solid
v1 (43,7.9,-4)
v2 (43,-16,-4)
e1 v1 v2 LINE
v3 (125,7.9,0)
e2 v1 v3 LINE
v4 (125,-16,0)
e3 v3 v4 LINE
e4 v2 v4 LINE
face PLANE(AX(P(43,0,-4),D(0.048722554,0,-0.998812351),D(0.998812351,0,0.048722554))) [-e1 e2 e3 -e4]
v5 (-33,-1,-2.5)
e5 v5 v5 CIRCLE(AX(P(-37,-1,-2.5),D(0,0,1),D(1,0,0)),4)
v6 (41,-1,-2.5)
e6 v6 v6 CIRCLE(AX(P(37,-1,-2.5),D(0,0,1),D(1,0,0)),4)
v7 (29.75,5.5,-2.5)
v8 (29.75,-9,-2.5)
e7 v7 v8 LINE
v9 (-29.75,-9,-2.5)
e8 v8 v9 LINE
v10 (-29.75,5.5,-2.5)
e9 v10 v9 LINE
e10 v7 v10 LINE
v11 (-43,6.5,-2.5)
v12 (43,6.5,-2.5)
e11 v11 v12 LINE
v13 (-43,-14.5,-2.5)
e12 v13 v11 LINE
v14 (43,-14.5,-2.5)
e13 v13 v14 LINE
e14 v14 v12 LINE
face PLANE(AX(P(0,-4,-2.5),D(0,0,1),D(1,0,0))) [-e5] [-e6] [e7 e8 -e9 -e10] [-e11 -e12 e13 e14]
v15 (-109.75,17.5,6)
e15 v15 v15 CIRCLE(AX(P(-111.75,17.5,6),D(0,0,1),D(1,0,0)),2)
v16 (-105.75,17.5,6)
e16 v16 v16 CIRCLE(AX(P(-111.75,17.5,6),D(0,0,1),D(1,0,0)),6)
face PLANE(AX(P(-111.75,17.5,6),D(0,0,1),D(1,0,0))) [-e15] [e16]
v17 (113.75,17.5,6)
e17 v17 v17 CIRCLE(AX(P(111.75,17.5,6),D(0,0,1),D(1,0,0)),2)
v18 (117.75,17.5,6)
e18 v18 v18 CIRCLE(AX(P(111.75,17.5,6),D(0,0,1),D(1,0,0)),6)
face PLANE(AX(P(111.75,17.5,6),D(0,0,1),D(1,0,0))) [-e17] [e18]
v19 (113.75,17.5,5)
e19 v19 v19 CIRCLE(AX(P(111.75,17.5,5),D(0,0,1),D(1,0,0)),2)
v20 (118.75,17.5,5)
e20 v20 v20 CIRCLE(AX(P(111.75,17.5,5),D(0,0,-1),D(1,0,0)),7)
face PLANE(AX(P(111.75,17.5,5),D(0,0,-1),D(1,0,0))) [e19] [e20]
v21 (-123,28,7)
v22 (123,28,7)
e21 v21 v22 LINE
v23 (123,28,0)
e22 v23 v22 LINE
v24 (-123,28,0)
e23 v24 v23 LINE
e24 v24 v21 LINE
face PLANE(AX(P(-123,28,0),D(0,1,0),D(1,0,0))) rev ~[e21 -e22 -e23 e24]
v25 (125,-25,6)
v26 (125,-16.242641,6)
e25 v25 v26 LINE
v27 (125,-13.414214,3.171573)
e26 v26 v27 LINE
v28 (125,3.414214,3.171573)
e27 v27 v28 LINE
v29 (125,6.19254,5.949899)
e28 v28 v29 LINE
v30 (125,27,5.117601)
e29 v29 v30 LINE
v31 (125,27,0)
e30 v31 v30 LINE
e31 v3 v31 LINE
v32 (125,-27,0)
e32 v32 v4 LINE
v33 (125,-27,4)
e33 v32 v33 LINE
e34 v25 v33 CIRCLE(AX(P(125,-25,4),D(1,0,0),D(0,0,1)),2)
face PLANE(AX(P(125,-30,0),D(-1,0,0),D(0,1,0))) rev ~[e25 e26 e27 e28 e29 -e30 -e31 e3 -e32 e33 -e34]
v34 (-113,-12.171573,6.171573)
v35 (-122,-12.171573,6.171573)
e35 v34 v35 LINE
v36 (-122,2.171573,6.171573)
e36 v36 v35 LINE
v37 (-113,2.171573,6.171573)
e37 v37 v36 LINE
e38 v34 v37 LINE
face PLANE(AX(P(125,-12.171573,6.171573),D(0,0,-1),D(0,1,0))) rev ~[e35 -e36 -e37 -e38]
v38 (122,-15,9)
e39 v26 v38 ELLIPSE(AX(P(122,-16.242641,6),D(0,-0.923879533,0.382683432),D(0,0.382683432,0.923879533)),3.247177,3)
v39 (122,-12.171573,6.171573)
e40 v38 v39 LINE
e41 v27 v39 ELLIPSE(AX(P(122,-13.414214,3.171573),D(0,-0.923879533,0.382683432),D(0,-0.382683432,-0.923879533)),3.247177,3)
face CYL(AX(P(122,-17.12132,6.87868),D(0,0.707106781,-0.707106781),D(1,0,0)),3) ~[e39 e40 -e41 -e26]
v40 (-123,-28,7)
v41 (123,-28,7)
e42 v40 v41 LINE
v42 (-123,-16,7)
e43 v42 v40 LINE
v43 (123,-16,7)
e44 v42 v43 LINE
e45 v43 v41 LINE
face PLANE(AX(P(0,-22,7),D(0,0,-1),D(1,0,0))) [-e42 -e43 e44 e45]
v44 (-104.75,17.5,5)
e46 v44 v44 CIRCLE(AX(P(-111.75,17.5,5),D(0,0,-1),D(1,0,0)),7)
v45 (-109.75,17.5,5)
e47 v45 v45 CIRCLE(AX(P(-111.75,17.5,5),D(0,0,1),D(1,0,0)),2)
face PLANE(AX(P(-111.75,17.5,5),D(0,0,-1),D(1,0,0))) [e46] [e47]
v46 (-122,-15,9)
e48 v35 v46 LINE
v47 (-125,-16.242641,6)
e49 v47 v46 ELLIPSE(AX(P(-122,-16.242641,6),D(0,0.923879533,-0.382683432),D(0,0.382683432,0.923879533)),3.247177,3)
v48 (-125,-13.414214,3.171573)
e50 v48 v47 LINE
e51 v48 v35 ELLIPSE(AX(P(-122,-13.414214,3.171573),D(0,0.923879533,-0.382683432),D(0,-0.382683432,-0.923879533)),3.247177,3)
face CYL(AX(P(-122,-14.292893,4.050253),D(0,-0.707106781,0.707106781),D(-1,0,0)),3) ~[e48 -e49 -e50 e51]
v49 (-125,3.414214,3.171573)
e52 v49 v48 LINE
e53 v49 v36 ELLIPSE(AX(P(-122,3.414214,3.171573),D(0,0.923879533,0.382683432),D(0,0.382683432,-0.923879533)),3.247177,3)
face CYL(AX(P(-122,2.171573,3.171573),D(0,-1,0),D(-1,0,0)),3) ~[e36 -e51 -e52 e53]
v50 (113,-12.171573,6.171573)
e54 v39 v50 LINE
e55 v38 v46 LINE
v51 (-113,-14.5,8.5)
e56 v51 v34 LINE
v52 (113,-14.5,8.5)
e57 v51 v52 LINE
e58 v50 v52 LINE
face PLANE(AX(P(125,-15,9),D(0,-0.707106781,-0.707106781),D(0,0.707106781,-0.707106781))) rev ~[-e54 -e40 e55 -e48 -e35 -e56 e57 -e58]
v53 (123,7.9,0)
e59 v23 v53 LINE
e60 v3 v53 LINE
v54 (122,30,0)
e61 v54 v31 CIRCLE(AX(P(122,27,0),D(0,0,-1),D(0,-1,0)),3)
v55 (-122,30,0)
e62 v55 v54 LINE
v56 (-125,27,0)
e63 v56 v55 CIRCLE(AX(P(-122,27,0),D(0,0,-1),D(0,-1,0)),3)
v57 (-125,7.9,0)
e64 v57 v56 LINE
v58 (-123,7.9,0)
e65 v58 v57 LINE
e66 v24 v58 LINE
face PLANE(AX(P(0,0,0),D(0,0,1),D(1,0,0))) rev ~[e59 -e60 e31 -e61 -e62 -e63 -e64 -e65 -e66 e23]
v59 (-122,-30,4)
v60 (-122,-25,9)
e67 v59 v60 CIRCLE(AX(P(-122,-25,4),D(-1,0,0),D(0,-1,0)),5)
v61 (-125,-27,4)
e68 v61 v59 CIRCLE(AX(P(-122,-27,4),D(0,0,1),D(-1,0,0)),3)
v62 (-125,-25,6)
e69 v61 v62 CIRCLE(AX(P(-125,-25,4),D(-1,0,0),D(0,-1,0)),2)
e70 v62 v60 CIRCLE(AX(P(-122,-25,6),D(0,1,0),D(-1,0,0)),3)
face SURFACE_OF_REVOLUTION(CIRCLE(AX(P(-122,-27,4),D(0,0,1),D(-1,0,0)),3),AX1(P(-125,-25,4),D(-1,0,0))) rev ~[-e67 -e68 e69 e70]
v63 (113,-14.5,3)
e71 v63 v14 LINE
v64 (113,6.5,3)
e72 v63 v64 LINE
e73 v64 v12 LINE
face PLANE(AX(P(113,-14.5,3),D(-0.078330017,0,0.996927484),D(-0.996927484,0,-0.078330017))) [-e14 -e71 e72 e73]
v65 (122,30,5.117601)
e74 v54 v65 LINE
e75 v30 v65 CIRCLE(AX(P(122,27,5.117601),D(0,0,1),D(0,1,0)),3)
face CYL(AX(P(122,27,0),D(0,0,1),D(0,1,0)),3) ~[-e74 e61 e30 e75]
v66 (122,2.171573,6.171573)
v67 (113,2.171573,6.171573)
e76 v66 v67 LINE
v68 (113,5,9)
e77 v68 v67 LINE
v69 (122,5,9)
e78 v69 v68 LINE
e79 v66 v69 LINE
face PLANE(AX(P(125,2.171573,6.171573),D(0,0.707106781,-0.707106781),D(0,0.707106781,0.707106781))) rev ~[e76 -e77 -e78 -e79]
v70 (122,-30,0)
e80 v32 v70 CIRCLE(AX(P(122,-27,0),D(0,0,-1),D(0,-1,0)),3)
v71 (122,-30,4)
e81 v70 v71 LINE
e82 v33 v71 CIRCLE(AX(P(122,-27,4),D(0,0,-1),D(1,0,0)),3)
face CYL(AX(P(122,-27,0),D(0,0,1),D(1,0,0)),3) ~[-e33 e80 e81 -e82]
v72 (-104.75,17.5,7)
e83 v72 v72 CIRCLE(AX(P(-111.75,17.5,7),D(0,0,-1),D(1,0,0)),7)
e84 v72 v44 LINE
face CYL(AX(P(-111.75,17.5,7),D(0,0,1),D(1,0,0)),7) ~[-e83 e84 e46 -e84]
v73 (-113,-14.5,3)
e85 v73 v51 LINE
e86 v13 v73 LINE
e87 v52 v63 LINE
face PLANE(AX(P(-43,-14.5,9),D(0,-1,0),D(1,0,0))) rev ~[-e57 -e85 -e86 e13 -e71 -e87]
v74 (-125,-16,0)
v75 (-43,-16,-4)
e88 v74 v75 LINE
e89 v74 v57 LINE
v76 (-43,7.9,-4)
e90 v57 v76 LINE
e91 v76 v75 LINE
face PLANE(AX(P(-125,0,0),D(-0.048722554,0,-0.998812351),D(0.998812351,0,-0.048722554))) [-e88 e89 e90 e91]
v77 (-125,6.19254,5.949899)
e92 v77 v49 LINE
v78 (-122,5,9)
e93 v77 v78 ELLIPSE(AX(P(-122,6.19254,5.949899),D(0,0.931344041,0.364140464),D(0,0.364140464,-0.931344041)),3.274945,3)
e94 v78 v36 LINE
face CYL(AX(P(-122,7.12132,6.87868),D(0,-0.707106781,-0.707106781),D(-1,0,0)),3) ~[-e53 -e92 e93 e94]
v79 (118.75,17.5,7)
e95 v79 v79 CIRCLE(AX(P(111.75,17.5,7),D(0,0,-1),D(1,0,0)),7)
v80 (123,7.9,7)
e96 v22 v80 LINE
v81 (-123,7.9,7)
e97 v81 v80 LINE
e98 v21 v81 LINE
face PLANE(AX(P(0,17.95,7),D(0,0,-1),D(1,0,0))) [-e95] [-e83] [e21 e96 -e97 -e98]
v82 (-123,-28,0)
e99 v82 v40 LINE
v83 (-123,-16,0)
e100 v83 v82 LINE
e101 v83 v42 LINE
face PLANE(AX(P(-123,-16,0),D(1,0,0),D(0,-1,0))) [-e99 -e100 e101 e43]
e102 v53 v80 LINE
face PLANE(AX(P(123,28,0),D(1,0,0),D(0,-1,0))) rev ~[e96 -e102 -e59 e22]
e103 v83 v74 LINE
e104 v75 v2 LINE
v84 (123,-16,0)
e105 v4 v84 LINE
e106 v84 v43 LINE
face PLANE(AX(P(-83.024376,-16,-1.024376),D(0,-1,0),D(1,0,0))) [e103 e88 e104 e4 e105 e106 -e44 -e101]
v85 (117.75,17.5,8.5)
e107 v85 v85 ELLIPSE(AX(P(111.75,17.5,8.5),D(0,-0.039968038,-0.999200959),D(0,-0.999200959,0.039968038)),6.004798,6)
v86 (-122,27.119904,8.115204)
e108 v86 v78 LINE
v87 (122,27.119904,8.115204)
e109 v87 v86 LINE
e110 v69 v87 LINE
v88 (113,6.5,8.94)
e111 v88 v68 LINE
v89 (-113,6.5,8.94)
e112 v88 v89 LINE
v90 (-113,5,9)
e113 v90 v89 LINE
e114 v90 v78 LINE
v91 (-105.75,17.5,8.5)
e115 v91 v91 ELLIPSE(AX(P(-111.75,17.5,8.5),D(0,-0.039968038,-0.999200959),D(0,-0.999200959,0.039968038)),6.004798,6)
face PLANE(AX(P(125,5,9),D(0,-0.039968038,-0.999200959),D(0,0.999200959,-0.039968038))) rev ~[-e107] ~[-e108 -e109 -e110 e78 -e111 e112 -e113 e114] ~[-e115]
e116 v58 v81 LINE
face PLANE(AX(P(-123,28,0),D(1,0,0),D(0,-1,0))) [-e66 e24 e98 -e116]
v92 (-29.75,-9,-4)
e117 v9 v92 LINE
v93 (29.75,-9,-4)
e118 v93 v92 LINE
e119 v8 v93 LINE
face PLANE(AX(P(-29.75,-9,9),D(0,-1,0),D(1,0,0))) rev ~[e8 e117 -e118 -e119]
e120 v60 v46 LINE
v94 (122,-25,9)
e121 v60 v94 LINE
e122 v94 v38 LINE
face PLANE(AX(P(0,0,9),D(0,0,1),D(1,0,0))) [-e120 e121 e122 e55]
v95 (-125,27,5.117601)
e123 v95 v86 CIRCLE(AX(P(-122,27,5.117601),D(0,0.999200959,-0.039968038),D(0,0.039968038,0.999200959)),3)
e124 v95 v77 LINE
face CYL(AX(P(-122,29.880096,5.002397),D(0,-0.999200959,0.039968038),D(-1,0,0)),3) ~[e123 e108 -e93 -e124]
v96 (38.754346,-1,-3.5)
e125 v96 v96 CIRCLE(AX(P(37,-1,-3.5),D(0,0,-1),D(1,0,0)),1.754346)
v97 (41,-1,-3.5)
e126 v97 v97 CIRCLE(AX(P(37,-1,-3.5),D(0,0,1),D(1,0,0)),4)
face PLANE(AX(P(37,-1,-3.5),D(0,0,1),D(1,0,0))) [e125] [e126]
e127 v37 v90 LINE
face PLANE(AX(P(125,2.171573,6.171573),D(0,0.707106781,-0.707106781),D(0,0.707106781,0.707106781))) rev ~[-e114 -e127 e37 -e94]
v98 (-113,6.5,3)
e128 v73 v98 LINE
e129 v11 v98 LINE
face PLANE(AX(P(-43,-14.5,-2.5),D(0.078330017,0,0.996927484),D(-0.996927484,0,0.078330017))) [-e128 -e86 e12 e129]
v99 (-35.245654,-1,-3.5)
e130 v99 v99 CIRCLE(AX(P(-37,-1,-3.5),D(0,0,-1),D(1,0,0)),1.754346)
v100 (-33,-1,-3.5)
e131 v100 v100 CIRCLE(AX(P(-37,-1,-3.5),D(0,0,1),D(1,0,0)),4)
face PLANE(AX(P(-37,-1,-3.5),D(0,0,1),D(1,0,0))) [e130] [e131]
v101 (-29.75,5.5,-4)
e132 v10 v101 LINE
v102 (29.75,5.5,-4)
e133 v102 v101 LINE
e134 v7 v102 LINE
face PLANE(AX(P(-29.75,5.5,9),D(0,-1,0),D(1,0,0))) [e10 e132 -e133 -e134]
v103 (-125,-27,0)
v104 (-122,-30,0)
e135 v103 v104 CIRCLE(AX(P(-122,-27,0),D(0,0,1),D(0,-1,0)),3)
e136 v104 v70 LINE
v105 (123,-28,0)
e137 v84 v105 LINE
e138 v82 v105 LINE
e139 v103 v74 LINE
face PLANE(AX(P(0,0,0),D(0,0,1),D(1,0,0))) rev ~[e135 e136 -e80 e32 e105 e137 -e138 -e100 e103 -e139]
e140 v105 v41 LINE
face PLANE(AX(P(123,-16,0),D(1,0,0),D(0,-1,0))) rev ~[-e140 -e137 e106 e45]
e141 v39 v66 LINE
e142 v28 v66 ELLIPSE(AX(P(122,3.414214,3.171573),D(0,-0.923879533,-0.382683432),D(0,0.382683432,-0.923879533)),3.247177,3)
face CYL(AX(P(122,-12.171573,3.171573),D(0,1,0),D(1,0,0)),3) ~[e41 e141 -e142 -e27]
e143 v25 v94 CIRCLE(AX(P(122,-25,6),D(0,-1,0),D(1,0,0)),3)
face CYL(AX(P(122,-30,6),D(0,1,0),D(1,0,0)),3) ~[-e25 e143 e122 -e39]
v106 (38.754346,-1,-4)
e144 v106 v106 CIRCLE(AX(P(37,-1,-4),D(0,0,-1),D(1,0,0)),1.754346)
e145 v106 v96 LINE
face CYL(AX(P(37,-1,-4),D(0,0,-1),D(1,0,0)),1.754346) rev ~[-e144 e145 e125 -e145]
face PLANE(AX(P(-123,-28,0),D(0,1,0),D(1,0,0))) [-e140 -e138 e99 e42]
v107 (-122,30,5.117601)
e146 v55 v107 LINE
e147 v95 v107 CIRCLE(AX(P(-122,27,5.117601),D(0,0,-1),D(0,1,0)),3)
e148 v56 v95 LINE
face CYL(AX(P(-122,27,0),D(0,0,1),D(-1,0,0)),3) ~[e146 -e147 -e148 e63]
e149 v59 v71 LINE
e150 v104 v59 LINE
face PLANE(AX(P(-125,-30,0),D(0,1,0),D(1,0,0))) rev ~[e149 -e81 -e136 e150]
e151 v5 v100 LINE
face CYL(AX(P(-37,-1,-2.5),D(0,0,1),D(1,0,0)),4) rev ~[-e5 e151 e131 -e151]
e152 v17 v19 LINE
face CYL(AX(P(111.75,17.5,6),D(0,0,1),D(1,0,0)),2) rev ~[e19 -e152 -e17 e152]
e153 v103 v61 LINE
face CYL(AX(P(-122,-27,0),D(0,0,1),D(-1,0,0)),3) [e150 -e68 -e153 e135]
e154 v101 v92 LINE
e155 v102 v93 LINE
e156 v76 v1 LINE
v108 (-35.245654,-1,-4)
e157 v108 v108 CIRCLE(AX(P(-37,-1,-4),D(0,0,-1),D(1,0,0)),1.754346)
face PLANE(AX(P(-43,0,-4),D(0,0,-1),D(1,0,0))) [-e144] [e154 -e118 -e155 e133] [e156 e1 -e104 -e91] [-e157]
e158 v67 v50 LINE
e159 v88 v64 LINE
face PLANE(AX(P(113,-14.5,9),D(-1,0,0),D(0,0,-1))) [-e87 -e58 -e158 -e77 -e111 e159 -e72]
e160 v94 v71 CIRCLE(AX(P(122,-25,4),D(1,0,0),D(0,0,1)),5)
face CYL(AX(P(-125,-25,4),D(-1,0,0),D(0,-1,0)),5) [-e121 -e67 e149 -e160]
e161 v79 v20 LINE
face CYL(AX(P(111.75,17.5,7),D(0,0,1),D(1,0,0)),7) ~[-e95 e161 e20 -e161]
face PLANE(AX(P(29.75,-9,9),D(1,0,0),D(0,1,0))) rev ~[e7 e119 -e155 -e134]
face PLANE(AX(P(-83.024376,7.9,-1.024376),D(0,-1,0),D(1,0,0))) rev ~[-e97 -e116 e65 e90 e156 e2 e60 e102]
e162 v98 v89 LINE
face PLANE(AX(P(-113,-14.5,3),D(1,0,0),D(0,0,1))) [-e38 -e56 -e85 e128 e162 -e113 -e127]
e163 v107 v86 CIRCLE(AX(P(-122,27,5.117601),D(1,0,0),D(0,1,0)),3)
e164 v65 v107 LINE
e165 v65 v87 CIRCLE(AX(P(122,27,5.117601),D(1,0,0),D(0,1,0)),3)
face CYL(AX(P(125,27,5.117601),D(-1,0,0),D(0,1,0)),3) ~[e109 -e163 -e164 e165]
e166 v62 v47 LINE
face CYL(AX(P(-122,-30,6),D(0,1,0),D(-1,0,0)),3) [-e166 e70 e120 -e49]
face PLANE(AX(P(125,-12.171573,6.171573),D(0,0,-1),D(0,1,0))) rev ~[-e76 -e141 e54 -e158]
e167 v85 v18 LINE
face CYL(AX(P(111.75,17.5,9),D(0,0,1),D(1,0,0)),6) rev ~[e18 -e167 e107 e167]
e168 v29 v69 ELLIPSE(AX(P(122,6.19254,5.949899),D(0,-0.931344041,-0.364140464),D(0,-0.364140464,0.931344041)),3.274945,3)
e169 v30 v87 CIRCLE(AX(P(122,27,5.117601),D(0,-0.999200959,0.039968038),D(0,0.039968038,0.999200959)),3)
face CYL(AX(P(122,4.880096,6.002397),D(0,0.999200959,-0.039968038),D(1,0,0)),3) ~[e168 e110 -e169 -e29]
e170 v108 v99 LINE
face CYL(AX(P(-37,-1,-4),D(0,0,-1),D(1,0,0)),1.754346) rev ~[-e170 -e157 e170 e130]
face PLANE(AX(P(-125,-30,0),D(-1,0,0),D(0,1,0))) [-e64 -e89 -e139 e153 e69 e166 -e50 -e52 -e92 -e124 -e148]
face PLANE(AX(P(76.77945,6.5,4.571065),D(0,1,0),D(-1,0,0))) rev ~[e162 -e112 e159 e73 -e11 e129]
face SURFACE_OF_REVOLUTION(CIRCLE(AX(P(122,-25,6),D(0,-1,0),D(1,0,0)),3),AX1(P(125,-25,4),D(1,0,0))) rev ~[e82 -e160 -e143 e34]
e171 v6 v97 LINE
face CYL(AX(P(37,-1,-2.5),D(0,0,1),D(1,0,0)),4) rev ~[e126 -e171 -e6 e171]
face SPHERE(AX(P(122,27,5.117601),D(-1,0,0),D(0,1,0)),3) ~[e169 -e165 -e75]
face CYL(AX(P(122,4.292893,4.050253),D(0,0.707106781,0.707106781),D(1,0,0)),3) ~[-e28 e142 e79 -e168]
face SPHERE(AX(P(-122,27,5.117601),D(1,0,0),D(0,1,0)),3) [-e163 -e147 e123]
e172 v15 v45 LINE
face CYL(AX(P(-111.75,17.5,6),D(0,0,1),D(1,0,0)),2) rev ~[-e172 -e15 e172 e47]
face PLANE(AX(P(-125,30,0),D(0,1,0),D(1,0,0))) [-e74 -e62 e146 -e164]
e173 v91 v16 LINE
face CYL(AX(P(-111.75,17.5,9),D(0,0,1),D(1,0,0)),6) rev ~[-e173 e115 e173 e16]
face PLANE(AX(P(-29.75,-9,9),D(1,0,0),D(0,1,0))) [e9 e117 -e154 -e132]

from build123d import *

# Parameters (mm, degrees)
F0_W         = 250
F0_H         = 60
F1_DEPTH     = 9
F2_W         = 86
F2_H         = 4
F3_DEPTH     = 16
F4_DEPTH     = 7.9
F5_W         = 59.5
F5_H         = 14.5
F6_DEPTH     = 13.001
F7_R         = 1.7543464605
F8_DEPTH     = 13.001
F9_W         = 246
F9_H         = 20.1
F9_H_2       = 12
F10_DEPTH    = 7
F11_R        = 1.9
F12_DEPTH    = 2.001
F14_R        = 7
F15_DEPTH    = 2
F13_R        = 6
F16_DEPTH    = 3
F17_R        = 2
F18_DEPTH    = 25
F19_W        = 86
F19_H        = 21
F20_DEPTH    = 11.5
F22_DEPTH    = 21
F24_DEPTH    = 250.001
F25_R        = 3
F26_T1_DEPTH = 250
F26_T4_ANGLE = 90
F26_T6_ANGLE = 90
F27_R        = 4
F28_DEPTH    = 1


# Not quite as in the source:
# - a fillet or chamfer that OpenCascade refuses, or shapes differently, is made with other operations: its cross-section is extruded or revolved along the edge and cut away or added


with BuildPart() as f1:
    # F0 (on Top) → F1 (new body)
    with BuildSketch(Plane.XY):
        Rectangle(F0_W, F0_H)
    extrude(amount=F1_DEPTH)

    # F2 (on Front) → F3 (join)
    with BuildSketch(Plane.XZ):
        Polygon((-43, 0), (-125, 0), (-43, -4), align=None)
        with Locations((0, -2)):
            Rectangle(F2_W, F2_H)
        Polygon((125, 0), (43, 0), (43, -4), align=None)
    extrude(amount=F3_DEPTH)

    # F2 (on Front) → F4 (join)
    with BuildSketch(Plane.XZ):
        Polygon((-43, 0), (-125, 0), (-43, -4), align=None)
        with Locations((0, -2)):
            Rectangle(F2_W, F2_H)
        Polygon((125, 0), (43, 0), (43, -4), align=None)
    extrude(amount=-F4_DEPTH)

    # F5 (on face) → F6 (cut, through all)
    with BuildSketch(Plane.XY.offset(9)):
        with Locations((0, -1.75)):
            Rectangle(F5_W, F5_H)
    extrude(amount=-F6_DEPTH, mode=Mode.SUBTRACT)

    # F7 (on face) → F8 (cut, through all)
    with BuildSketch(Plane(origin=(0, 0, -4), x_dir=(1, 0, 0), z_dir=(0, 0, -1))):
        with Locations((-37, 1)):
            Circle(F7_R)
        with Locations((37, 1)):
            Circle(F7_R)
    extrude(amount=-F8_DEPTH, mode=Mode.SUBTRACT)

    # F9 (on face) → F10 (cut)
    with BuildSketch(Plane(origin=(0, 0, 0), x_dir=(1, 0, 0), z_dir=(0, 0, -1))):
        with Locations((0, -17.95)):
            Rectangle(F9_W, F9_H)
        with Locations((0, 22)):
            Rectangle(F9_W, F9_H_2)
    extrude(amount=-F10_DEPTH, mode=Mode.SUBTRACT)

    # F11 (on face) → F12 (cut, through all)
    with BuildSketch(Plane(origin=(0, 0, 7), x_dir=(1, 0, 0), z_dir=(0, 0, -1))):
        with Locations((-111.75, -17.5)):
            Circle(F11_R)
        with Locations((111.75, -17.5)):
            Circle(F11_R)
    extrude(amount=-F12_DEPTH, mode=Mode.SUBTRACT)

    # F14 (on face) → F15 (join)
    with BuildSketch(Plane(origin=(0, 0, 7), x_dir=(1, 0, 0), z_dir=(0, 0, -1))):
        with Locations((-111.75, -17.5)):
            Circle(F14_R)
        with Locations((111.75, -17.5)):
            Circle(F14_R)
    extrude(amount=F15_DEPTH)

    # F13 (on face) → F16 (cut)
    with BuildSketch(Plane.XY.offset(9)):
        with Locations((-111.75, 17.5)):
            Circle(F13_R)
        with Locations((111.75, 17.5)):
            Circle(F13_R)
    extrude(amount=-F16_DEPTH, mode=Mode.SUBTRACT)

    # F17 (on face) → F18 (cut)
    with BuildSketch(Plane.XY.offset(6)):
        with Locations((111.75, 17.5)):
            Circle(F17_R)
        with Locations((-111.75, 17.5)):
            Circle(F17_R)
    extrude(amount=-F18_DEPTH, mode=Mode.SUBTRACT)

    # F19 (on face) → F20 (cut)
    with BuildSketch(Plane.XY.offset(9)):
        with Locations((0, -4)):
            Rectangle(F19_W, F19_H)
    extrude(amount=-F20_DEPTH, mode=Mode.SUBTRACT)

    # F21 (on face) → F22 (cut)
    with BuildSketch(Plane(origin=(0, -14.5, 0), x_dir=(-1, 0, 0), z_dir=(0, 1, 0))):
        Polygon((113, 9), (43, 9), (43, -2.5), (113, 3), align=None)
        Polygon((-43, -2.5), (-43, 9), (-113, 9), (-113, 3), align=None)
    extrude(amount=F22_DEPTH, mode=Mode.SUBTRACT)

    # F23 (on face) → F24 (cut, through all)
    with BuildSketch(Plane.YZ.offset(125)):
        Polygon((2.1715728753, 6.1715728753), (5, 9), (-15, 9), (-12.1715728753, 6.1715728753), align=None)
        Polygon((5, 9), (30, 8), (30, 9), align=None)
    extrude(amount=-F24_DEPTH, mode=Mode.SUBTRACT)

    # F25
    f25_edges = [f1.edges().sort_by_distance(p)[0] for p in [
        (125, -22.5, 9),
        (0, 30, 8),
        (-125, -22.5, 9),
        (125, -13.585786, 7.585786),
        (125, -5, 6.171573),
        (125, 3.585786, 7.585786),
        (-125, 3.585786, 7.585786),
        (-125, -5, 6.171573),
        (-125, -13.585786, 7.585786),
        (-125, 30, 4),
        (-125, -30, 4.5),
        (125, -30, 4.5),
        (125, 30, 4),
        (125, 17.5, 8.5),
        (-125, 17.5, 8.5),
    ]]
    fillet(f25_edges, radius=F25_R)

    # F26: fillet of radius 5 on 1 edges, made by hand

    # F26_s2 → F26_t1 (cut)
    with BuildSketch(Plane.YZ.offset(-125)):
        with BuildLine():
            ThreePointArc((-30, 4), (-28.5355339059, 7.5355339059), (-25, 9))
            Line((-25, 9), (-30, 9))
            Line((-30, 9), (-30, 4))
        make_face()
    extrude(amount=F26_T1_DEPTH, mode=Mode.SUBTRACT)

    # F26_s3 → F26_t4 (revolve, cut)
    with BuildSketch(Plane.XY.offset(4)):
        with BuildLine():
            ThreePointArc((-125, -27), (-124.1213203436, -29.1213203436), (-122, -30))
            Line((-122, -30), (-125, -30))
            Line((-125, -30), (-125, -27))
        make_face()
    revolve(axis=Axis((-125, -25, 4), (-1, 0, 0)), revolution_arc=F26_T4_ANGLE, mode=Mode.SUBTRACT)

    # F26_s5 → F26_t6 (revolve, cut)
    with BuildSketch(Plane.XZ.offset(25)):
        with BuildLine():
            ThreePointArc((125, 6), (124.1213203436, 8.1213203436), (122, 9))
            Line((122, 9), (125, 9))
            Line((125, 9), (125, 6))
        make_face()
    revolve(axis=Axis((125, -25, 4), (1, 0, 0)), revolution_arc=F26_T6_ANGLE, mode=Mode.SUBTRACT)

    # F27 (on face) → F28 (cut)
    with BuildSketch(Plane.XY.offset(-2.5)):
        with Locations((37, -1)):
            Circle(F27_R)
        with Locations((-37, -1)):
            Circle(F27_R)
    extrude(amount=-F28_DEPTH, mode=Mode.SUBTRACT)


solid = f1.part
